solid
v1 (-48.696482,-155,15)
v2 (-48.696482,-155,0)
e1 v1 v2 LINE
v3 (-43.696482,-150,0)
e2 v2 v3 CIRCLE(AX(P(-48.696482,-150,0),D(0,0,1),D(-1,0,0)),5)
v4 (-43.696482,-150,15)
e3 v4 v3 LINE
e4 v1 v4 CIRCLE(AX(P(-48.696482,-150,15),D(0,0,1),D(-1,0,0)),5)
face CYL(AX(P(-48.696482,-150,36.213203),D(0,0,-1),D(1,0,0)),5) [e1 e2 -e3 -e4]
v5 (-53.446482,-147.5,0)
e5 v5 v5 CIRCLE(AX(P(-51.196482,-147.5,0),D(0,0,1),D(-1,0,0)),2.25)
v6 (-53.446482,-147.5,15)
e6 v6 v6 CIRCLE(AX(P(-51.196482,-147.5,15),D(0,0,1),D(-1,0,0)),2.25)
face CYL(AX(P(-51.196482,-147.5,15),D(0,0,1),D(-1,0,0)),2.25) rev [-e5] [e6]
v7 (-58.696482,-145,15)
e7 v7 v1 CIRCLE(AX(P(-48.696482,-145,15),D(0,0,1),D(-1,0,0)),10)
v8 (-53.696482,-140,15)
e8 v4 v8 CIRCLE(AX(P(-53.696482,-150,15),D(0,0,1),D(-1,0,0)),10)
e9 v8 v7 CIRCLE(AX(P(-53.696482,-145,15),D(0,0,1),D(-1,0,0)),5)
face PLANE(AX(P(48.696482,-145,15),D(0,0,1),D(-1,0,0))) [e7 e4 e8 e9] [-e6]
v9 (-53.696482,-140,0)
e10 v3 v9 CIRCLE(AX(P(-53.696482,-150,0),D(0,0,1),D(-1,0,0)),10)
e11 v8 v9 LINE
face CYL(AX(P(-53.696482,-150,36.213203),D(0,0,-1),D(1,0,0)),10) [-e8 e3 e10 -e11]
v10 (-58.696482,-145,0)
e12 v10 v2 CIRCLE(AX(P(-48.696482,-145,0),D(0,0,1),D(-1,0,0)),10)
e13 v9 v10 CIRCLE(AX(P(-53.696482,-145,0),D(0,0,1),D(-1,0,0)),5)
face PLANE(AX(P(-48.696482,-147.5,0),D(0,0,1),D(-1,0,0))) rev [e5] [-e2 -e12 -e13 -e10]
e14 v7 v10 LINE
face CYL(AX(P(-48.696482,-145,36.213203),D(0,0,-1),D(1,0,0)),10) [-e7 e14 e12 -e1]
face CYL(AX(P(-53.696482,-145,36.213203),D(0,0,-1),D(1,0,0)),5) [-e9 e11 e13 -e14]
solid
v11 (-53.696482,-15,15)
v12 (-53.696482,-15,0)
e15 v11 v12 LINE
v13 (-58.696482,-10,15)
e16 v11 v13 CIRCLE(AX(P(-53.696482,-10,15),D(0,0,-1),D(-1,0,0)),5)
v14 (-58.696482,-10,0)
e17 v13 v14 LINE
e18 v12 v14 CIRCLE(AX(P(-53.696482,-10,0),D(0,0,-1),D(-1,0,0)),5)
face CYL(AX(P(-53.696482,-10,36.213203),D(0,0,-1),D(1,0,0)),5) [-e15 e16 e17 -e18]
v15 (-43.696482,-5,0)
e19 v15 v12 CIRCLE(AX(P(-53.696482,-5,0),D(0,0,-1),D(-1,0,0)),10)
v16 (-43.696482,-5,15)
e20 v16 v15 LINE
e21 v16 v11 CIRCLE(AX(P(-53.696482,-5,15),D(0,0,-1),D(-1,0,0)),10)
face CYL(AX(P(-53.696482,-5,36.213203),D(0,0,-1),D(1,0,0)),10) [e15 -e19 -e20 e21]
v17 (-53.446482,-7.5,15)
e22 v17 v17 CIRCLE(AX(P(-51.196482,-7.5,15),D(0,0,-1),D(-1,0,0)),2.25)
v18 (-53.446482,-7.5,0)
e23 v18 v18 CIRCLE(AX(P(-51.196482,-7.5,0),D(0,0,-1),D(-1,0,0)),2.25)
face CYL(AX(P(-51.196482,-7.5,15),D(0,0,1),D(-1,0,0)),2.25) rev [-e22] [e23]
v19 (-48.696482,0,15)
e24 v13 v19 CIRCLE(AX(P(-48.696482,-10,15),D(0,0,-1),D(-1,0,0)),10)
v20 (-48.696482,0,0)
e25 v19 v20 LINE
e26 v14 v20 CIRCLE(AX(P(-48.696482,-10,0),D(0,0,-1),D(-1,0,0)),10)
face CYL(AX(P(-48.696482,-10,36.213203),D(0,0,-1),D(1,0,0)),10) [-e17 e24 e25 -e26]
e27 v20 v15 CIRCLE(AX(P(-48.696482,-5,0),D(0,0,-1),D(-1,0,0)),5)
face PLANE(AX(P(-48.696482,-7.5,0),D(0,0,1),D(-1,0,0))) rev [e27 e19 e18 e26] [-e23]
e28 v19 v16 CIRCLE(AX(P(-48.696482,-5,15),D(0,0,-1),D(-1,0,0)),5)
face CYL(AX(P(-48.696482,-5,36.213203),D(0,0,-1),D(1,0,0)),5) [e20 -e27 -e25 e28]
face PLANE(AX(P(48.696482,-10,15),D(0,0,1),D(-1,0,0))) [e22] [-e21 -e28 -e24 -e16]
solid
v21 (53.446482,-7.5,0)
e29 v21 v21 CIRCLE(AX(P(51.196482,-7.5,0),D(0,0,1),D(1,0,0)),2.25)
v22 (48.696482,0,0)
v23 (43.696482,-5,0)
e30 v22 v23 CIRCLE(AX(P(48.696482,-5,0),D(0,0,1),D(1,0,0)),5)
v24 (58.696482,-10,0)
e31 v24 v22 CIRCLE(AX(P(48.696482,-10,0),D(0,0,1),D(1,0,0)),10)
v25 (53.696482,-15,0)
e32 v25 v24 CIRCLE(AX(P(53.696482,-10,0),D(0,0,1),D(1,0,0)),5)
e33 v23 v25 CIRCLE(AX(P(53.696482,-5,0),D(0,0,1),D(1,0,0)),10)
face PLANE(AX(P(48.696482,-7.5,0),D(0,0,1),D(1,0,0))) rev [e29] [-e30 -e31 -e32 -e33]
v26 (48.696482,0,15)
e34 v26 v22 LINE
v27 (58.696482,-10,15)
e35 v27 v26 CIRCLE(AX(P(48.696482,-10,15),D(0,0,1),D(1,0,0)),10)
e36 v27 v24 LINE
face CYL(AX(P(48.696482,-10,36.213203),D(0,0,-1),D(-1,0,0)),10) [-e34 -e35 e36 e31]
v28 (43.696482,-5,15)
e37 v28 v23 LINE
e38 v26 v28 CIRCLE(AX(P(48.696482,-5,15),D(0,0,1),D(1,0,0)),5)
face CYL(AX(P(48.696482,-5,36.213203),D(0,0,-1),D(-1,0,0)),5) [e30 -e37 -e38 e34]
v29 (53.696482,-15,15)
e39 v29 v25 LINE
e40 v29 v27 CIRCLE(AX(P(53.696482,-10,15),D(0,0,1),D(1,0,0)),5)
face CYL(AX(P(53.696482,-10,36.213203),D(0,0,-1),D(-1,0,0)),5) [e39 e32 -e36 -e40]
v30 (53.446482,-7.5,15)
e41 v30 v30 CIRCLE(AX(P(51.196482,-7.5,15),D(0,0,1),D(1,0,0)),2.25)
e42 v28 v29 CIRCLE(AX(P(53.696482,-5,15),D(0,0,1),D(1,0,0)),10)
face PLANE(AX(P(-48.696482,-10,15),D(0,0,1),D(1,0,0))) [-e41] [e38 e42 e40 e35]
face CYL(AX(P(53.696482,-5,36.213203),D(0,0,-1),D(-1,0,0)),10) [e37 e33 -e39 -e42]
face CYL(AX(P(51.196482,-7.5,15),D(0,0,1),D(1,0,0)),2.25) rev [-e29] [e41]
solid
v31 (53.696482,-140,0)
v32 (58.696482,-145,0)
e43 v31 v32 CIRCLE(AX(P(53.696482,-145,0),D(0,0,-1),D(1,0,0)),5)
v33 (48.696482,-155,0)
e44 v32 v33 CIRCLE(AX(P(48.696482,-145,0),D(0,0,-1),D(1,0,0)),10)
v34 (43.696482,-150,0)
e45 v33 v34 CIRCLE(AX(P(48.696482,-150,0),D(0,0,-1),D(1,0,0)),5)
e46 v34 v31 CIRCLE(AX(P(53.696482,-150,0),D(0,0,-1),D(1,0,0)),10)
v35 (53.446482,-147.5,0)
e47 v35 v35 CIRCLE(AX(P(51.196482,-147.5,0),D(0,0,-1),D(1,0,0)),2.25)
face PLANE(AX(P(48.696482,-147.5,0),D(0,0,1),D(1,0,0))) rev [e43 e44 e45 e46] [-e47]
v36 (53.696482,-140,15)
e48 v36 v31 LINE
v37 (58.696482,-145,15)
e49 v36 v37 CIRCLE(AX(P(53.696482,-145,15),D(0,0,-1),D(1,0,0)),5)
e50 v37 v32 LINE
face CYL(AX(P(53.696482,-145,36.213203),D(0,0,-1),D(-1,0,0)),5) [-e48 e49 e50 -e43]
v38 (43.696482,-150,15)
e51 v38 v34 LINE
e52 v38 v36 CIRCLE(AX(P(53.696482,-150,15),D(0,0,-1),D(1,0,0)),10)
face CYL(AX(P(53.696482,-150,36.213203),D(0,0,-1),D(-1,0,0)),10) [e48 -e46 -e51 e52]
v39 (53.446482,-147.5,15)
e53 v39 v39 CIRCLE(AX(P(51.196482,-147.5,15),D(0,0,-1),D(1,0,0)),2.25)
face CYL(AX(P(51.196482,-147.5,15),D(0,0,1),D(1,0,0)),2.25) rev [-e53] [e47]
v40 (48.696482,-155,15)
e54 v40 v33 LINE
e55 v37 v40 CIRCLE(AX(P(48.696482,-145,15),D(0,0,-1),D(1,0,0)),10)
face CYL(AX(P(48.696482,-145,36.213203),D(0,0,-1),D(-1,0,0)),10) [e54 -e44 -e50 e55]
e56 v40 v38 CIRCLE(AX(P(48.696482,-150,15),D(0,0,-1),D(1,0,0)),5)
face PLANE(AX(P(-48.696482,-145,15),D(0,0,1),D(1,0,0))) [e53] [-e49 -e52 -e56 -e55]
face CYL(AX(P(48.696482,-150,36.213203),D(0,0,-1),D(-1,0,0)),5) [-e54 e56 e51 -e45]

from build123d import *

# Parameters (mm, degrees)
BOSS_EXTRU_1_DEPTH  = 15
D_GAGEMENT_M41_D    = 4.5
SYM_TRIE1_OUTLINE_R = 2.25
SYM_TRIE1_DEPTH     = 15


# Read off the part's stored shape, not the designer's step: Symétrie1
with BuildPart() as part:
    # Esquisse1 → Boss.-Extru.1 (new body)
    with BuildSketch(Plane.XY):
        with BuildLine():
            ThreePointArc((48.696481526, 0), (45.16094762, -1.464466094), (43.696481526, -5))
            ThreePointArc((43.696481526, -5), (46.625413714, -12.071067812), (53.696481526, -15))
            ThreePointArc((53.696481526, -15), (57.232015432, -13.535533906), (58.696481526, -10))
            ThreePointArc((58.696481526, -10), (55.767549338, -2.928932188), (48.696481526, 0))
        make_face()
    extrude(amount=BOSS_EXTRU_1_DEPTH)

    # Dégagement M41 (through all)
    with Locations(Plane.XY.offset(15)):
        with Locations((51.196481526, -7.5)):
            Hole(D_GAGEMENT_M41_D / 2)


with BuildPart() as body_2:
    # Symétrie1 outline → Symétrie1 (new body)
    # profile 1 of 3: a face of its own
    with BuildSketch(Plane.XY):
        with BuildLine():
            ThreePointArc((-58.696481526, -145), (-55.767549338, -152.071067812), (-48.696481526, -155))
            ThreePointArc((-48.696481526, -155), (-45.16094762, -153.535533906), (-43.696481526, -150))
            ThreePointArc((-43.696481526, -150), (-46.625413714, -142.928932188), (-53.696481526, -140))
            ThreePointArc((-53.696481526, -140), (-57.232015432, -141.464466094), (-58.696481526, -145))
        make_face()
        with Locations((-51.196481526, -147.5)):
            Circle(SYM_TRIE1_OUTLINE_R, mode=Mode.SUBTRACT)
    # profile 2 of 3: a face of its own
    with BuildSketch(Plane.XY):
        with BuildLine():
            ThreePointArc((-48.696481526, 0), (-55.767549338, -2.928932188), (-58.696481526, -10))
            ThreePointArc((-58.696481526, -10), (-57.232015432, -13.535533906), (-53.696481526, -15))
            ThreePointArc((-53.696481526, -15), (-46.625413714, -12.071067812), (-43.696481526, -5))
            ThreePointArc((-43.696481526, -5), (-45.16094762, -1.464466094), (-48.696481526, 0))
        make_face()
        with Locations((-51.196481526, -7.5)):
            Circle(SYM_TRIE1_OUTLINE_R, mode=Mode.SUBTRACT)
    # profile 3 of 3: a face of its own
    with BuildSketch(Plane.XY):
        with BuildLine():
            ThreePointArc((48.696481526, -155), (55.767549338, -152.071067812), (58.696481526, -145))
            ThreePointArc((58.696481526, -145), (57.232015432, -141.464466094), (53.696481526, -140))
            ThreePointArc((53.696481526, -140), (46.625413714, -142.928932188), (43.696481526, -150))
            ThreePointArc((43.696481526, -150), (45.16094762, -153.535533906), (48.696481526, -155))
        make_face()
        with Locations((51.196481526, -147.5)):
            Circle(SYM_TRIE1_OUTLINE_R, mode=Mode.SUBTRACT)
    extrude(amount=SYM_TRIE1_DEPTH)


solid = Compound([part.part, body_2.part])
